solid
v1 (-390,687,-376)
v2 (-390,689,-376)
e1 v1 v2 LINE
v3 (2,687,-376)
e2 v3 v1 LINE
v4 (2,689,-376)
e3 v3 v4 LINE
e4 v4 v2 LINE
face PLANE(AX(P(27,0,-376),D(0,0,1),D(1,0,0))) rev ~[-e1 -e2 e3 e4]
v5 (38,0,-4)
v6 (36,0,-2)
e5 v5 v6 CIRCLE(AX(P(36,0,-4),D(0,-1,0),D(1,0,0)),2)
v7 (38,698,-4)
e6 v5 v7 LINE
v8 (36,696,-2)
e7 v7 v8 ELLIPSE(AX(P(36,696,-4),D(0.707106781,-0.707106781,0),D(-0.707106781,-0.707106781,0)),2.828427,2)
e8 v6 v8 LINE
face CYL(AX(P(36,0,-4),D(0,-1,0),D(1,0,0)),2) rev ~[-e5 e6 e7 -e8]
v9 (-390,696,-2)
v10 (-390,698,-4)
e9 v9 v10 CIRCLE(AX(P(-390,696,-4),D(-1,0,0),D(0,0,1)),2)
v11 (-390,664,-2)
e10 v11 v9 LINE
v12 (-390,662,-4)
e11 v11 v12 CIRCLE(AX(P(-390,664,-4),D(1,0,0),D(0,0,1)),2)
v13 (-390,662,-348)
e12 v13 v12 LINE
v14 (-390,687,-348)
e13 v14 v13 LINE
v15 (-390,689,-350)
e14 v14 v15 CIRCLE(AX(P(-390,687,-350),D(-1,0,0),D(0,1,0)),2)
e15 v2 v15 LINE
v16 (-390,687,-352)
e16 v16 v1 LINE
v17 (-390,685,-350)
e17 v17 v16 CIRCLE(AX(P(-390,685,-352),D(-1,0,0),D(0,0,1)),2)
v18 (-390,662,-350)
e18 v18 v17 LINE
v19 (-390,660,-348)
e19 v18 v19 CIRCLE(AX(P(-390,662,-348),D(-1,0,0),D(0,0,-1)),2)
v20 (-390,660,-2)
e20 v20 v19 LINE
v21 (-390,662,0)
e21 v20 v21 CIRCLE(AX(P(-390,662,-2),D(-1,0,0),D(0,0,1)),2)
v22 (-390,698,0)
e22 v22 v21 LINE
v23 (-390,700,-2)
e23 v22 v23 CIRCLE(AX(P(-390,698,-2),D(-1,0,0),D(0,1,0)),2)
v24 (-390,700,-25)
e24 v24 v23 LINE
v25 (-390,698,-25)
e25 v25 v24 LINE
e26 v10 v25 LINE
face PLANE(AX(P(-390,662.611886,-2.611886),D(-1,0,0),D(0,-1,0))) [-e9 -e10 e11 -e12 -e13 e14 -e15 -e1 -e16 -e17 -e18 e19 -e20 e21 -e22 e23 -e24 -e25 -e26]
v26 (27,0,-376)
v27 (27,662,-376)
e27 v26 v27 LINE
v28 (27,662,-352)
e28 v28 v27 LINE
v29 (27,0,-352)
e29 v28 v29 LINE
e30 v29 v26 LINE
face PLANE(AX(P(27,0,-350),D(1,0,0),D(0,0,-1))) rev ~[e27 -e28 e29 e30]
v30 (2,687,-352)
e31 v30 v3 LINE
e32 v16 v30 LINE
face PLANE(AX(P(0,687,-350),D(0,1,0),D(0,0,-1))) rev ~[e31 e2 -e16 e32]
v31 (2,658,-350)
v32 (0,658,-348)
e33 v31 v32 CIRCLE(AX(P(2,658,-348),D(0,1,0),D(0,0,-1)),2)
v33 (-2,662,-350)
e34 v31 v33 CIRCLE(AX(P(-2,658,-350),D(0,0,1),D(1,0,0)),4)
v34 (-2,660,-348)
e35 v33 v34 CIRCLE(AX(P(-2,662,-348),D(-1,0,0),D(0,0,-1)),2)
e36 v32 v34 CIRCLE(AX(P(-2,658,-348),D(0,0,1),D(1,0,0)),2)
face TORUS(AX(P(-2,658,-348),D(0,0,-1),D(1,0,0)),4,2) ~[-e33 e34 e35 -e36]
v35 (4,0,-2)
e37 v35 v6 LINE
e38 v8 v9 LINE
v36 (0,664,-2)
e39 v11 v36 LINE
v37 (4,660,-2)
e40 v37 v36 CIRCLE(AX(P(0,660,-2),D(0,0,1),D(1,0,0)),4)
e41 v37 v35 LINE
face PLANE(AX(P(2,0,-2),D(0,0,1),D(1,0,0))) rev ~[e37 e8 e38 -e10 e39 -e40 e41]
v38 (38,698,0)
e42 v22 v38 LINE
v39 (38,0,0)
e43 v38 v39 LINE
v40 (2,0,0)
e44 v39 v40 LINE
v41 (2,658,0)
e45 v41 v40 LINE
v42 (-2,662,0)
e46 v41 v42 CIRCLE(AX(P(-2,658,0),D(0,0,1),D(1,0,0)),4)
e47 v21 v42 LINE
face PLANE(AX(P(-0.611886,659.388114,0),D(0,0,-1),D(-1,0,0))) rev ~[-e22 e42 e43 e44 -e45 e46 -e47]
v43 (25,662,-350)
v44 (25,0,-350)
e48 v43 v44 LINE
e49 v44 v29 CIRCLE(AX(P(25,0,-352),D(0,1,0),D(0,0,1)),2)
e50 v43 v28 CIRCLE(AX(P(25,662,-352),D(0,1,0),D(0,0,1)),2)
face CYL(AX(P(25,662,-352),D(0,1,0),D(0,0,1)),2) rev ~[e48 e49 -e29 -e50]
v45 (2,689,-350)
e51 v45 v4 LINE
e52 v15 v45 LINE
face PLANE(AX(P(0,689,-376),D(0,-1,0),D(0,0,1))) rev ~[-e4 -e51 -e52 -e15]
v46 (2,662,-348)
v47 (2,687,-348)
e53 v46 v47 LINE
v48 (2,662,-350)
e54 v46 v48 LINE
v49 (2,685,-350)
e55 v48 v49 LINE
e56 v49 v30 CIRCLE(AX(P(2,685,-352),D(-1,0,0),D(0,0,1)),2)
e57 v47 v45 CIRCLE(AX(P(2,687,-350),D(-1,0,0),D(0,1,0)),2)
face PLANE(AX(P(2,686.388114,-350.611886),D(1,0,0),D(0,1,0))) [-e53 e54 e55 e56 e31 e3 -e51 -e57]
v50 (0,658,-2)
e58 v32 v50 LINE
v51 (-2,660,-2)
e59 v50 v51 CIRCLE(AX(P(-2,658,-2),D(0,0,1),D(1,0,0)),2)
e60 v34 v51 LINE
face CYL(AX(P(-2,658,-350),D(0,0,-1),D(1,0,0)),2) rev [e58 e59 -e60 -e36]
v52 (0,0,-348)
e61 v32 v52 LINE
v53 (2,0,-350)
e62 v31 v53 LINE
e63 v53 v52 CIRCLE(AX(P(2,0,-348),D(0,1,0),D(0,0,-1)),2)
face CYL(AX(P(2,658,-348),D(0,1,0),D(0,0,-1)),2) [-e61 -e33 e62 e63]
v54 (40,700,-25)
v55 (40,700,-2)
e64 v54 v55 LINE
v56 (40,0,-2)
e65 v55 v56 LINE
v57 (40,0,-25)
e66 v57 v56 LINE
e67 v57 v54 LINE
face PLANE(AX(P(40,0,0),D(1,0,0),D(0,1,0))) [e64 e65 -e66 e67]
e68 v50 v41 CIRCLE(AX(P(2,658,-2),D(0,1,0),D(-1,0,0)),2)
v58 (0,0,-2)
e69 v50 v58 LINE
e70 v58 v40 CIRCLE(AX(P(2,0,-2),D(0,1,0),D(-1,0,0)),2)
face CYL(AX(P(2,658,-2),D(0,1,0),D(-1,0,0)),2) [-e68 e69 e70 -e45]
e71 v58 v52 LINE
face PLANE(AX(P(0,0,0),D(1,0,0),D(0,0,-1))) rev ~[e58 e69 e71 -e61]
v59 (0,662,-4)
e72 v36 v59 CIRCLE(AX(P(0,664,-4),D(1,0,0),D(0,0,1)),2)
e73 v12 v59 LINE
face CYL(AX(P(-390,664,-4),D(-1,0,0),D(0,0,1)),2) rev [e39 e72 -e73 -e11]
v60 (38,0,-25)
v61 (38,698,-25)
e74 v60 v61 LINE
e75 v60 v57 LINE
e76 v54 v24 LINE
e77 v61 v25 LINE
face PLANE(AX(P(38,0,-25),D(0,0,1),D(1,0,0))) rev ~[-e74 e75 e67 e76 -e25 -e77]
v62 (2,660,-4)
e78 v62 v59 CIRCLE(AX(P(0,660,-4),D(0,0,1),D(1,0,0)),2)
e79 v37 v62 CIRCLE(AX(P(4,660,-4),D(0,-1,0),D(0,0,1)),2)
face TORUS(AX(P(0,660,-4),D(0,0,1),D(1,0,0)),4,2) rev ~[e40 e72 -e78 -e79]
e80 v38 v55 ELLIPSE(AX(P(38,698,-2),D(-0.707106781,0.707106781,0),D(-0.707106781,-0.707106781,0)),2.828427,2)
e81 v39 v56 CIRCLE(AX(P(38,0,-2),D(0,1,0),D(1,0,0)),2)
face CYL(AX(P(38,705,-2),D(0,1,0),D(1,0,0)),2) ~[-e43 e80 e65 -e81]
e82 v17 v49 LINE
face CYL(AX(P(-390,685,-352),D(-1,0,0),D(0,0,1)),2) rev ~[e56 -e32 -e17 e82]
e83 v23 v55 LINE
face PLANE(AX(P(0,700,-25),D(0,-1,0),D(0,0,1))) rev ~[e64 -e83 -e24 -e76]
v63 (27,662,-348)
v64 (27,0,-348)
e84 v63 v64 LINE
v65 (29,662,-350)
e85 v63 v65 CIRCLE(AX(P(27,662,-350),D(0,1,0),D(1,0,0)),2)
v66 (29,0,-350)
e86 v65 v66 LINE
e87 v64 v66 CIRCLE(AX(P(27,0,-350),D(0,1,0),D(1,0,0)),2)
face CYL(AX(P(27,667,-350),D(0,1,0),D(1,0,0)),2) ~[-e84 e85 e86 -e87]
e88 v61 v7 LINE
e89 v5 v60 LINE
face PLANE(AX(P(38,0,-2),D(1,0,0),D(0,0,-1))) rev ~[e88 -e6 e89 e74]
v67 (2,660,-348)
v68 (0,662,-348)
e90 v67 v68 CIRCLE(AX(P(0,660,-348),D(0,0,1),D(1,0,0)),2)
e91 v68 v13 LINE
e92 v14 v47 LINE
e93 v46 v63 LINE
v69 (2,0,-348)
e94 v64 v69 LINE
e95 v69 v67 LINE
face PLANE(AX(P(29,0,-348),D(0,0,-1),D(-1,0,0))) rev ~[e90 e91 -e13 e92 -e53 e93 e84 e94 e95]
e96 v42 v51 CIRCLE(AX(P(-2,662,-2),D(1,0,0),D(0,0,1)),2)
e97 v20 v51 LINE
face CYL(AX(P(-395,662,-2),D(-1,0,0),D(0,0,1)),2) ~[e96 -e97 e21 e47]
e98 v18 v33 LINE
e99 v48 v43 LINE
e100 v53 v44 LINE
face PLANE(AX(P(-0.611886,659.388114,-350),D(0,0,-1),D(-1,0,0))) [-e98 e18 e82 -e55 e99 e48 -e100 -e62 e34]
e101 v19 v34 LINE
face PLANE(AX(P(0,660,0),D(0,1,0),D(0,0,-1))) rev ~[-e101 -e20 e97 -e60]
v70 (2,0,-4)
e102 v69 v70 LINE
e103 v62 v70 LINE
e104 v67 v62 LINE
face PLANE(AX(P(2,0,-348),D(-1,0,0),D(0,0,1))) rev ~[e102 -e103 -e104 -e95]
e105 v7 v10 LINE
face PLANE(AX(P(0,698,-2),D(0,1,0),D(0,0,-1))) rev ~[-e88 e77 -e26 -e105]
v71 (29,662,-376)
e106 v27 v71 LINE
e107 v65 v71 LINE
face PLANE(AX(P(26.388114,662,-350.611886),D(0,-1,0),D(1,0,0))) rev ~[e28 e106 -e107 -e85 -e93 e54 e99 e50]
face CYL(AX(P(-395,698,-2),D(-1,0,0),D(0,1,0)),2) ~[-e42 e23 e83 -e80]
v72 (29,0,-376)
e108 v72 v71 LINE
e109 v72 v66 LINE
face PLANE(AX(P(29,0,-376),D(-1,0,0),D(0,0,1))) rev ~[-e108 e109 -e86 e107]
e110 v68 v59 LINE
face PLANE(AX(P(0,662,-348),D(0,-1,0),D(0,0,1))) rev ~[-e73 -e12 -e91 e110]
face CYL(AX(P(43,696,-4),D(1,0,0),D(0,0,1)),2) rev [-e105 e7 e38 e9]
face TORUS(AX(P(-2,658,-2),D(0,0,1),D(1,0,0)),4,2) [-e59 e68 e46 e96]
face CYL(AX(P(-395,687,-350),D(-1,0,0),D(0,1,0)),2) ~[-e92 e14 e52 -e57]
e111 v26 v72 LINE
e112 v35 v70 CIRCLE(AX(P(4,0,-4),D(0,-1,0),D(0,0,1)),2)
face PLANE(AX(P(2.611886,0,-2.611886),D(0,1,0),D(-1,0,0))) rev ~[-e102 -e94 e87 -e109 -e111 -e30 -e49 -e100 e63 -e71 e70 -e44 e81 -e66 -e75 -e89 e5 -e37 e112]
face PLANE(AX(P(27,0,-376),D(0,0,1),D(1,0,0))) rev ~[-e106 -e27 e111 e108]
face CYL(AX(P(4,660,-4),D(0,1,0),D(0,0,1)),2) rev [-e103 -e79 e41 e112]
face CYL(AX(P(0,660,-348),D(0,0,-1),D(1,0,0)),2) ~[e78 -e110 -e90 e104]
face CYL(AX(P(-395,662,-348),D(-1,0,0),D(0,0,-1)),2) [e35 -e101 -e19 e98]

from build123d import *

# Parameters (mm, degrees)
F3_W         = 27
F3_H         = 27
F4_DEPTH     = 30
F5_T1_DEPTH  = 392
F5_T3_DEPTH  = 662
F5_T5_DEPTH  = 350
F5_T10_DEPTH = 703
F5_T15_DEPTH = 433
F5_T17_DEPTH = 672
F5_T19_DEPTH = 402
F5_T21_DEPTH = 440
F5_T23_DEPTH = 710
F5_T25_DEPTH = 346
F5_T27_DEPTH = 660
F5_T29_DEPTH = 390
F5_T32_ANGLE = 90
F5_T33_DEPTH = 663
F5_T35_DEPTH = 393
F5_T38_ANGLE = 90
F5_T40_ANGLE = 90


# Not quite as in the source:
# - a fillet or chamfer that OpenCascade refuses, or shapes differently, is made with other operations: its cross-section is extruded or revolved along the edge and cut away or added


with BuildPart() as f2:
    # F2: sweep along a path in F1
    with BuildLine(Plane.XY) as f2_path:
        Line((0, 0), (0, 660))
        Line((0, 660), (-390, 660))
    # F0 (on Front) → F2 (sweep)
    with BuildSketch(Plane.XZ):
        Polygon((38, -2), (38, -25), (40, -25), (40, 0), (0, 0), (0, -350), (27, -350), (27, -376), (29, -376), (29, -348), (2, -348), (2, -2), align=None)
    sweep(path=f2_path.line, transition=Transition.RIGHT)

    # F3 (on face) → F4 (cut)
    with BuildSketch(Plane.XY.offset(-348)):
        with Locations((15.5, 675.5)):
            Rectangle(F3_W, F3_H)
    extrude(amount=-F4_DEPTH, mode=Mode.SUBTRACT)

    # F5: fillet of radius 2 on 16 edges, made by hand

    # F5_s2 → F5_t1 (join)
    with BuildSketch(Plane.YZ.offset(-390)):
        with BuildLine():
            ThreePointArc((685, -350), (686.4142135624, -350.5857864376), (687, -352))
            Line((687, -352), (687, -350))
            Line((687, -350), (685, -350))
        make_face()
    extrude(amount=F5_T1_DEPTH)

    # F5_s4 → F5_t3 (join)
    with BuildSketch(Plane.XZ.offset(-662)):
        with BuildLine():
            ThreePointArc((25, -350), (26.4142135624, -350.5857864376), (27, -352))
            Line((27, -352), (27, -350))
            Line((27, -350), (25, -350))
        make_face()
    extrude(amount=F5_T3_DEPTH)

    # F5_s6 → F5_t5 (join)
    with BuildSketch(Plane.XY.offset(-350)):
        with BuildLine():
            ThreePointArc((0, 658), (-0.5857864376, 659.4142135624), (-2, 660))
            Line((-2, 660), (0, 660))
            Line((0, 660), (0, 658))
        make_face()
    extrude(amount=F5_T5_DEPTH)


with BuildPart() as f5_tool8:
    # F5_s9 → F5_t10 (new body)
    with BuildSketch(Plane.XZ):
        with BuildLine():
            ThreePointArc((38, -4), (37.4142135624, -2.5857864376), (36, -2))
            Line((36, -2), (38, -2))
            Line((38, -2), (38, -4))
        make_face()
    extrude(amount=-F5_T10_DEPTH)

    split(bisect_by=Plane.XZ.offset(-700), keep=Keep.TOP)


with BuildPart() as f2_1:
    add(f2.part)

    # F5_t7: union F5_tool8
    add(f5_tool8.part)


with BuildPart() as f5_tool13:
    # F5_s14 → F5_t15 (new body)
    with BuildSketch(Plane.YZ.offset(43)):
        with BuildLine():
            ThreePointArc((696, -2), (697.4142135624, -2.5857864376), (698, -4))
            Line((698, -4), (698, -2))
            Line((698, -2), (696, -2))
        make_face()
    extrude(amount=-F5_T15_DEPTH)

    split(bisect_by=Plane.YZ.offset(40), keep=Keep.BOTTOM)


with BuildPart() as f2_2:
    add(f2_1.part)

    # F5_t12: union F5_tool13
    add(f5_tool13.part)

    # F5_s18 → F5_t17 (cut)
    with BuildSketch(Plane.XZ.offset(-667)):
        with BuildLine():
            ThreePointArc((29, -350), (28.4142135624, -348.5857864376), (27, -348))
            Line((27, -348), (29, -348))
            Line((29, -348), (29, -350))
        make_face()
    extrude(amount=F5_T17_DEPTH, mode=Mode.SUBTRACT)

    # F5_s20 → F5_t19 (cut)
    with BuildSketch(Plane.YZ.offset(-395)):
        with BuildLine():
            ThreePointArc((689, -350), (688.4142135624, -348.5857864376), (687, -348))
            Line((687, -348), (689, -348))
            Line((689, -348), (689, -350))
        make_face()
    extrude(amount=F5_T19_DEPTH, mode=Mode.SUBTRACT)

    # F5_s22 → F5_t21 (cut)
    with BuildSketch(Plane.YZ.offset(-395)):
        with BuildLine():
            ThreePointArc((700, -2), (699.4142135624, -0.5857864376), (698, 0))
            Line((698, 0), (700, 0))
            Line((700, 0), (700, -2))
        make_face()
    extrude(amount=F5_T21_DEPTH, mode=Mode.SUBTRACT)

    # F5_s24 → F5_t23 (cut)
    with BuildSketch(Plane.XZ.offset(-705)):
        with BuildLine():
            ThreePointArc((40, -2), (39.4142135624, -0.5857864376), (38, 0))
            Line((38, 0), (40, 0))
            Line((40, 0), (40, -2))
        make_face()
    extrude(amount=F5_T23_DEPTH, mode=Mode.SUBTRACT)

    # F5_s26 → F5_t25 (cut)
    with BuildSketch(Plane.XY.offset(-348)):
        with BuildLine():
            ThreePointArc((2, 660), (1.4142135624, 661.4142135624), (0, 662))
            Line((0, 662), (2, 662))
            Line((2, 662), (2, 660))
        make_face()
    extrude(amount=F5_T25_DEPTH, mode=Mode.SUBTRACT)

    # F5_s28 → F5_t27 (join)
    with BuildSketch(Plane.XZ.offset(-660)):
        with BuildLine():
            ThreePointArc((4, -2), (2.5857864376, -2.5857864376), (2, -4))
            Line((2, -4), (2, -2))
            Line((2, -2), (4, -2))
        make_face()
    extrude(amount=F5_T27_DEPTH)

    # F5_s30 → F5_t29 (join)
    with BuildSketch(Plane.YZ.offset(-390)):
        with BuildLine():
            ThreePointArc((664, -2), (662.5857864376, -2.5857864376), (662, -4))
            Line((662, -4), (662, -2))
            Line((662, -2), (664, -2))
        make_face()
    extrude(amount=F5_T29_DEPTH)

    # F5_s31 → F5_t32 (revolve)
    with BuildSketch(Plane.XZ.offset(-660)):
        with BuildLine():
            ThreePointArc((4, -2), (2.5857864376, -2.5857864376), (2, -4))
            Line((2, -4), (2, -2))
            Line((2, -2), (4, -2))
        make_face()
    revolve(axis=Axis((0, 660, -2), (0, 0, 1)), revolution_arc=F5_T32_ANGLE)

    # F5_s34 → F5_t33 (cut)
    with BuildSketch(Plane.XZ.offset(-658)):
        with BuildLine():
            ThreePointArc((2, -350), (0.5857864376, -349.4142135624), (0, -348))
            Line((0, -348), (0, -350))
            Line((0, -350), (2, -350))
        make_face()
        with BuildLine():
            ThreePointArc((0, -2), (0.5857864376, -0.5857864376), (2, 0))
            Line((2, 0), (0, 0))
            Line((0, 0), (0, -2))
        make_face()
    extrude(amount=F5_T33_DEPTH, mode=Mode.SUBTRACT)

    # F5_s36 → F5_t35 (cut)
    with BuildSketch(Plane.YZ.offset(-395)):
        with BuildLine():
            ThreePointArc((662, -350), (660.5857864376, -349.4142135624), (660, -348))
            Line((660, -348), (660, -350))
            Line((660, -350), (662, -350))
        make_face()
        with BuildLine():
            ThreePointArc((662, 0), (660.5857864376, -0.5857864376), (660, -2))
            Line((660, -2), (660, 0))
            Line((660, 0), (662, 0))
        make_face()
    extrude(amount=F5_T35_DEPTH, mode=Mode.SUBTRACT)

    # F5_s37 → F5_t38 (revolve, cut)
    with BuildSketch(Plane.XZ.offset(-658)):
        with BuildLine():
            ThreePointArc((2, 0), (0.5857864376, -0.5857864376), (0, -2))
            Line((0, -2), (0, 0))
            Line((0, 0), (2, 0))
        make_face()
    revolve(axis=Axis((-2, 658, 0), (0, 0, 1)), revolution_arc=F5_T38_ANGLE, mode=Mode.SUBTRACT)

    # F5_s39 → F5_t40 (revolve, cut)
    with BuildSketch(Plane.XZ.offset(-658)):
        with BuildLine():
            ThreePointArc((2, -350), (0.5857864376, -349.4142135624), (0, -348))
            Line((0, -348), (0, -350))
            Line((0, -350), (2, -350))
        make_face()
    revolve(axis=Axis((-2, 658, -350), (0, 0, 1)), revolution_arc=F5_T40_ANGLE, mode=Mode.SUBTRACT)


solid = f2_2.part
